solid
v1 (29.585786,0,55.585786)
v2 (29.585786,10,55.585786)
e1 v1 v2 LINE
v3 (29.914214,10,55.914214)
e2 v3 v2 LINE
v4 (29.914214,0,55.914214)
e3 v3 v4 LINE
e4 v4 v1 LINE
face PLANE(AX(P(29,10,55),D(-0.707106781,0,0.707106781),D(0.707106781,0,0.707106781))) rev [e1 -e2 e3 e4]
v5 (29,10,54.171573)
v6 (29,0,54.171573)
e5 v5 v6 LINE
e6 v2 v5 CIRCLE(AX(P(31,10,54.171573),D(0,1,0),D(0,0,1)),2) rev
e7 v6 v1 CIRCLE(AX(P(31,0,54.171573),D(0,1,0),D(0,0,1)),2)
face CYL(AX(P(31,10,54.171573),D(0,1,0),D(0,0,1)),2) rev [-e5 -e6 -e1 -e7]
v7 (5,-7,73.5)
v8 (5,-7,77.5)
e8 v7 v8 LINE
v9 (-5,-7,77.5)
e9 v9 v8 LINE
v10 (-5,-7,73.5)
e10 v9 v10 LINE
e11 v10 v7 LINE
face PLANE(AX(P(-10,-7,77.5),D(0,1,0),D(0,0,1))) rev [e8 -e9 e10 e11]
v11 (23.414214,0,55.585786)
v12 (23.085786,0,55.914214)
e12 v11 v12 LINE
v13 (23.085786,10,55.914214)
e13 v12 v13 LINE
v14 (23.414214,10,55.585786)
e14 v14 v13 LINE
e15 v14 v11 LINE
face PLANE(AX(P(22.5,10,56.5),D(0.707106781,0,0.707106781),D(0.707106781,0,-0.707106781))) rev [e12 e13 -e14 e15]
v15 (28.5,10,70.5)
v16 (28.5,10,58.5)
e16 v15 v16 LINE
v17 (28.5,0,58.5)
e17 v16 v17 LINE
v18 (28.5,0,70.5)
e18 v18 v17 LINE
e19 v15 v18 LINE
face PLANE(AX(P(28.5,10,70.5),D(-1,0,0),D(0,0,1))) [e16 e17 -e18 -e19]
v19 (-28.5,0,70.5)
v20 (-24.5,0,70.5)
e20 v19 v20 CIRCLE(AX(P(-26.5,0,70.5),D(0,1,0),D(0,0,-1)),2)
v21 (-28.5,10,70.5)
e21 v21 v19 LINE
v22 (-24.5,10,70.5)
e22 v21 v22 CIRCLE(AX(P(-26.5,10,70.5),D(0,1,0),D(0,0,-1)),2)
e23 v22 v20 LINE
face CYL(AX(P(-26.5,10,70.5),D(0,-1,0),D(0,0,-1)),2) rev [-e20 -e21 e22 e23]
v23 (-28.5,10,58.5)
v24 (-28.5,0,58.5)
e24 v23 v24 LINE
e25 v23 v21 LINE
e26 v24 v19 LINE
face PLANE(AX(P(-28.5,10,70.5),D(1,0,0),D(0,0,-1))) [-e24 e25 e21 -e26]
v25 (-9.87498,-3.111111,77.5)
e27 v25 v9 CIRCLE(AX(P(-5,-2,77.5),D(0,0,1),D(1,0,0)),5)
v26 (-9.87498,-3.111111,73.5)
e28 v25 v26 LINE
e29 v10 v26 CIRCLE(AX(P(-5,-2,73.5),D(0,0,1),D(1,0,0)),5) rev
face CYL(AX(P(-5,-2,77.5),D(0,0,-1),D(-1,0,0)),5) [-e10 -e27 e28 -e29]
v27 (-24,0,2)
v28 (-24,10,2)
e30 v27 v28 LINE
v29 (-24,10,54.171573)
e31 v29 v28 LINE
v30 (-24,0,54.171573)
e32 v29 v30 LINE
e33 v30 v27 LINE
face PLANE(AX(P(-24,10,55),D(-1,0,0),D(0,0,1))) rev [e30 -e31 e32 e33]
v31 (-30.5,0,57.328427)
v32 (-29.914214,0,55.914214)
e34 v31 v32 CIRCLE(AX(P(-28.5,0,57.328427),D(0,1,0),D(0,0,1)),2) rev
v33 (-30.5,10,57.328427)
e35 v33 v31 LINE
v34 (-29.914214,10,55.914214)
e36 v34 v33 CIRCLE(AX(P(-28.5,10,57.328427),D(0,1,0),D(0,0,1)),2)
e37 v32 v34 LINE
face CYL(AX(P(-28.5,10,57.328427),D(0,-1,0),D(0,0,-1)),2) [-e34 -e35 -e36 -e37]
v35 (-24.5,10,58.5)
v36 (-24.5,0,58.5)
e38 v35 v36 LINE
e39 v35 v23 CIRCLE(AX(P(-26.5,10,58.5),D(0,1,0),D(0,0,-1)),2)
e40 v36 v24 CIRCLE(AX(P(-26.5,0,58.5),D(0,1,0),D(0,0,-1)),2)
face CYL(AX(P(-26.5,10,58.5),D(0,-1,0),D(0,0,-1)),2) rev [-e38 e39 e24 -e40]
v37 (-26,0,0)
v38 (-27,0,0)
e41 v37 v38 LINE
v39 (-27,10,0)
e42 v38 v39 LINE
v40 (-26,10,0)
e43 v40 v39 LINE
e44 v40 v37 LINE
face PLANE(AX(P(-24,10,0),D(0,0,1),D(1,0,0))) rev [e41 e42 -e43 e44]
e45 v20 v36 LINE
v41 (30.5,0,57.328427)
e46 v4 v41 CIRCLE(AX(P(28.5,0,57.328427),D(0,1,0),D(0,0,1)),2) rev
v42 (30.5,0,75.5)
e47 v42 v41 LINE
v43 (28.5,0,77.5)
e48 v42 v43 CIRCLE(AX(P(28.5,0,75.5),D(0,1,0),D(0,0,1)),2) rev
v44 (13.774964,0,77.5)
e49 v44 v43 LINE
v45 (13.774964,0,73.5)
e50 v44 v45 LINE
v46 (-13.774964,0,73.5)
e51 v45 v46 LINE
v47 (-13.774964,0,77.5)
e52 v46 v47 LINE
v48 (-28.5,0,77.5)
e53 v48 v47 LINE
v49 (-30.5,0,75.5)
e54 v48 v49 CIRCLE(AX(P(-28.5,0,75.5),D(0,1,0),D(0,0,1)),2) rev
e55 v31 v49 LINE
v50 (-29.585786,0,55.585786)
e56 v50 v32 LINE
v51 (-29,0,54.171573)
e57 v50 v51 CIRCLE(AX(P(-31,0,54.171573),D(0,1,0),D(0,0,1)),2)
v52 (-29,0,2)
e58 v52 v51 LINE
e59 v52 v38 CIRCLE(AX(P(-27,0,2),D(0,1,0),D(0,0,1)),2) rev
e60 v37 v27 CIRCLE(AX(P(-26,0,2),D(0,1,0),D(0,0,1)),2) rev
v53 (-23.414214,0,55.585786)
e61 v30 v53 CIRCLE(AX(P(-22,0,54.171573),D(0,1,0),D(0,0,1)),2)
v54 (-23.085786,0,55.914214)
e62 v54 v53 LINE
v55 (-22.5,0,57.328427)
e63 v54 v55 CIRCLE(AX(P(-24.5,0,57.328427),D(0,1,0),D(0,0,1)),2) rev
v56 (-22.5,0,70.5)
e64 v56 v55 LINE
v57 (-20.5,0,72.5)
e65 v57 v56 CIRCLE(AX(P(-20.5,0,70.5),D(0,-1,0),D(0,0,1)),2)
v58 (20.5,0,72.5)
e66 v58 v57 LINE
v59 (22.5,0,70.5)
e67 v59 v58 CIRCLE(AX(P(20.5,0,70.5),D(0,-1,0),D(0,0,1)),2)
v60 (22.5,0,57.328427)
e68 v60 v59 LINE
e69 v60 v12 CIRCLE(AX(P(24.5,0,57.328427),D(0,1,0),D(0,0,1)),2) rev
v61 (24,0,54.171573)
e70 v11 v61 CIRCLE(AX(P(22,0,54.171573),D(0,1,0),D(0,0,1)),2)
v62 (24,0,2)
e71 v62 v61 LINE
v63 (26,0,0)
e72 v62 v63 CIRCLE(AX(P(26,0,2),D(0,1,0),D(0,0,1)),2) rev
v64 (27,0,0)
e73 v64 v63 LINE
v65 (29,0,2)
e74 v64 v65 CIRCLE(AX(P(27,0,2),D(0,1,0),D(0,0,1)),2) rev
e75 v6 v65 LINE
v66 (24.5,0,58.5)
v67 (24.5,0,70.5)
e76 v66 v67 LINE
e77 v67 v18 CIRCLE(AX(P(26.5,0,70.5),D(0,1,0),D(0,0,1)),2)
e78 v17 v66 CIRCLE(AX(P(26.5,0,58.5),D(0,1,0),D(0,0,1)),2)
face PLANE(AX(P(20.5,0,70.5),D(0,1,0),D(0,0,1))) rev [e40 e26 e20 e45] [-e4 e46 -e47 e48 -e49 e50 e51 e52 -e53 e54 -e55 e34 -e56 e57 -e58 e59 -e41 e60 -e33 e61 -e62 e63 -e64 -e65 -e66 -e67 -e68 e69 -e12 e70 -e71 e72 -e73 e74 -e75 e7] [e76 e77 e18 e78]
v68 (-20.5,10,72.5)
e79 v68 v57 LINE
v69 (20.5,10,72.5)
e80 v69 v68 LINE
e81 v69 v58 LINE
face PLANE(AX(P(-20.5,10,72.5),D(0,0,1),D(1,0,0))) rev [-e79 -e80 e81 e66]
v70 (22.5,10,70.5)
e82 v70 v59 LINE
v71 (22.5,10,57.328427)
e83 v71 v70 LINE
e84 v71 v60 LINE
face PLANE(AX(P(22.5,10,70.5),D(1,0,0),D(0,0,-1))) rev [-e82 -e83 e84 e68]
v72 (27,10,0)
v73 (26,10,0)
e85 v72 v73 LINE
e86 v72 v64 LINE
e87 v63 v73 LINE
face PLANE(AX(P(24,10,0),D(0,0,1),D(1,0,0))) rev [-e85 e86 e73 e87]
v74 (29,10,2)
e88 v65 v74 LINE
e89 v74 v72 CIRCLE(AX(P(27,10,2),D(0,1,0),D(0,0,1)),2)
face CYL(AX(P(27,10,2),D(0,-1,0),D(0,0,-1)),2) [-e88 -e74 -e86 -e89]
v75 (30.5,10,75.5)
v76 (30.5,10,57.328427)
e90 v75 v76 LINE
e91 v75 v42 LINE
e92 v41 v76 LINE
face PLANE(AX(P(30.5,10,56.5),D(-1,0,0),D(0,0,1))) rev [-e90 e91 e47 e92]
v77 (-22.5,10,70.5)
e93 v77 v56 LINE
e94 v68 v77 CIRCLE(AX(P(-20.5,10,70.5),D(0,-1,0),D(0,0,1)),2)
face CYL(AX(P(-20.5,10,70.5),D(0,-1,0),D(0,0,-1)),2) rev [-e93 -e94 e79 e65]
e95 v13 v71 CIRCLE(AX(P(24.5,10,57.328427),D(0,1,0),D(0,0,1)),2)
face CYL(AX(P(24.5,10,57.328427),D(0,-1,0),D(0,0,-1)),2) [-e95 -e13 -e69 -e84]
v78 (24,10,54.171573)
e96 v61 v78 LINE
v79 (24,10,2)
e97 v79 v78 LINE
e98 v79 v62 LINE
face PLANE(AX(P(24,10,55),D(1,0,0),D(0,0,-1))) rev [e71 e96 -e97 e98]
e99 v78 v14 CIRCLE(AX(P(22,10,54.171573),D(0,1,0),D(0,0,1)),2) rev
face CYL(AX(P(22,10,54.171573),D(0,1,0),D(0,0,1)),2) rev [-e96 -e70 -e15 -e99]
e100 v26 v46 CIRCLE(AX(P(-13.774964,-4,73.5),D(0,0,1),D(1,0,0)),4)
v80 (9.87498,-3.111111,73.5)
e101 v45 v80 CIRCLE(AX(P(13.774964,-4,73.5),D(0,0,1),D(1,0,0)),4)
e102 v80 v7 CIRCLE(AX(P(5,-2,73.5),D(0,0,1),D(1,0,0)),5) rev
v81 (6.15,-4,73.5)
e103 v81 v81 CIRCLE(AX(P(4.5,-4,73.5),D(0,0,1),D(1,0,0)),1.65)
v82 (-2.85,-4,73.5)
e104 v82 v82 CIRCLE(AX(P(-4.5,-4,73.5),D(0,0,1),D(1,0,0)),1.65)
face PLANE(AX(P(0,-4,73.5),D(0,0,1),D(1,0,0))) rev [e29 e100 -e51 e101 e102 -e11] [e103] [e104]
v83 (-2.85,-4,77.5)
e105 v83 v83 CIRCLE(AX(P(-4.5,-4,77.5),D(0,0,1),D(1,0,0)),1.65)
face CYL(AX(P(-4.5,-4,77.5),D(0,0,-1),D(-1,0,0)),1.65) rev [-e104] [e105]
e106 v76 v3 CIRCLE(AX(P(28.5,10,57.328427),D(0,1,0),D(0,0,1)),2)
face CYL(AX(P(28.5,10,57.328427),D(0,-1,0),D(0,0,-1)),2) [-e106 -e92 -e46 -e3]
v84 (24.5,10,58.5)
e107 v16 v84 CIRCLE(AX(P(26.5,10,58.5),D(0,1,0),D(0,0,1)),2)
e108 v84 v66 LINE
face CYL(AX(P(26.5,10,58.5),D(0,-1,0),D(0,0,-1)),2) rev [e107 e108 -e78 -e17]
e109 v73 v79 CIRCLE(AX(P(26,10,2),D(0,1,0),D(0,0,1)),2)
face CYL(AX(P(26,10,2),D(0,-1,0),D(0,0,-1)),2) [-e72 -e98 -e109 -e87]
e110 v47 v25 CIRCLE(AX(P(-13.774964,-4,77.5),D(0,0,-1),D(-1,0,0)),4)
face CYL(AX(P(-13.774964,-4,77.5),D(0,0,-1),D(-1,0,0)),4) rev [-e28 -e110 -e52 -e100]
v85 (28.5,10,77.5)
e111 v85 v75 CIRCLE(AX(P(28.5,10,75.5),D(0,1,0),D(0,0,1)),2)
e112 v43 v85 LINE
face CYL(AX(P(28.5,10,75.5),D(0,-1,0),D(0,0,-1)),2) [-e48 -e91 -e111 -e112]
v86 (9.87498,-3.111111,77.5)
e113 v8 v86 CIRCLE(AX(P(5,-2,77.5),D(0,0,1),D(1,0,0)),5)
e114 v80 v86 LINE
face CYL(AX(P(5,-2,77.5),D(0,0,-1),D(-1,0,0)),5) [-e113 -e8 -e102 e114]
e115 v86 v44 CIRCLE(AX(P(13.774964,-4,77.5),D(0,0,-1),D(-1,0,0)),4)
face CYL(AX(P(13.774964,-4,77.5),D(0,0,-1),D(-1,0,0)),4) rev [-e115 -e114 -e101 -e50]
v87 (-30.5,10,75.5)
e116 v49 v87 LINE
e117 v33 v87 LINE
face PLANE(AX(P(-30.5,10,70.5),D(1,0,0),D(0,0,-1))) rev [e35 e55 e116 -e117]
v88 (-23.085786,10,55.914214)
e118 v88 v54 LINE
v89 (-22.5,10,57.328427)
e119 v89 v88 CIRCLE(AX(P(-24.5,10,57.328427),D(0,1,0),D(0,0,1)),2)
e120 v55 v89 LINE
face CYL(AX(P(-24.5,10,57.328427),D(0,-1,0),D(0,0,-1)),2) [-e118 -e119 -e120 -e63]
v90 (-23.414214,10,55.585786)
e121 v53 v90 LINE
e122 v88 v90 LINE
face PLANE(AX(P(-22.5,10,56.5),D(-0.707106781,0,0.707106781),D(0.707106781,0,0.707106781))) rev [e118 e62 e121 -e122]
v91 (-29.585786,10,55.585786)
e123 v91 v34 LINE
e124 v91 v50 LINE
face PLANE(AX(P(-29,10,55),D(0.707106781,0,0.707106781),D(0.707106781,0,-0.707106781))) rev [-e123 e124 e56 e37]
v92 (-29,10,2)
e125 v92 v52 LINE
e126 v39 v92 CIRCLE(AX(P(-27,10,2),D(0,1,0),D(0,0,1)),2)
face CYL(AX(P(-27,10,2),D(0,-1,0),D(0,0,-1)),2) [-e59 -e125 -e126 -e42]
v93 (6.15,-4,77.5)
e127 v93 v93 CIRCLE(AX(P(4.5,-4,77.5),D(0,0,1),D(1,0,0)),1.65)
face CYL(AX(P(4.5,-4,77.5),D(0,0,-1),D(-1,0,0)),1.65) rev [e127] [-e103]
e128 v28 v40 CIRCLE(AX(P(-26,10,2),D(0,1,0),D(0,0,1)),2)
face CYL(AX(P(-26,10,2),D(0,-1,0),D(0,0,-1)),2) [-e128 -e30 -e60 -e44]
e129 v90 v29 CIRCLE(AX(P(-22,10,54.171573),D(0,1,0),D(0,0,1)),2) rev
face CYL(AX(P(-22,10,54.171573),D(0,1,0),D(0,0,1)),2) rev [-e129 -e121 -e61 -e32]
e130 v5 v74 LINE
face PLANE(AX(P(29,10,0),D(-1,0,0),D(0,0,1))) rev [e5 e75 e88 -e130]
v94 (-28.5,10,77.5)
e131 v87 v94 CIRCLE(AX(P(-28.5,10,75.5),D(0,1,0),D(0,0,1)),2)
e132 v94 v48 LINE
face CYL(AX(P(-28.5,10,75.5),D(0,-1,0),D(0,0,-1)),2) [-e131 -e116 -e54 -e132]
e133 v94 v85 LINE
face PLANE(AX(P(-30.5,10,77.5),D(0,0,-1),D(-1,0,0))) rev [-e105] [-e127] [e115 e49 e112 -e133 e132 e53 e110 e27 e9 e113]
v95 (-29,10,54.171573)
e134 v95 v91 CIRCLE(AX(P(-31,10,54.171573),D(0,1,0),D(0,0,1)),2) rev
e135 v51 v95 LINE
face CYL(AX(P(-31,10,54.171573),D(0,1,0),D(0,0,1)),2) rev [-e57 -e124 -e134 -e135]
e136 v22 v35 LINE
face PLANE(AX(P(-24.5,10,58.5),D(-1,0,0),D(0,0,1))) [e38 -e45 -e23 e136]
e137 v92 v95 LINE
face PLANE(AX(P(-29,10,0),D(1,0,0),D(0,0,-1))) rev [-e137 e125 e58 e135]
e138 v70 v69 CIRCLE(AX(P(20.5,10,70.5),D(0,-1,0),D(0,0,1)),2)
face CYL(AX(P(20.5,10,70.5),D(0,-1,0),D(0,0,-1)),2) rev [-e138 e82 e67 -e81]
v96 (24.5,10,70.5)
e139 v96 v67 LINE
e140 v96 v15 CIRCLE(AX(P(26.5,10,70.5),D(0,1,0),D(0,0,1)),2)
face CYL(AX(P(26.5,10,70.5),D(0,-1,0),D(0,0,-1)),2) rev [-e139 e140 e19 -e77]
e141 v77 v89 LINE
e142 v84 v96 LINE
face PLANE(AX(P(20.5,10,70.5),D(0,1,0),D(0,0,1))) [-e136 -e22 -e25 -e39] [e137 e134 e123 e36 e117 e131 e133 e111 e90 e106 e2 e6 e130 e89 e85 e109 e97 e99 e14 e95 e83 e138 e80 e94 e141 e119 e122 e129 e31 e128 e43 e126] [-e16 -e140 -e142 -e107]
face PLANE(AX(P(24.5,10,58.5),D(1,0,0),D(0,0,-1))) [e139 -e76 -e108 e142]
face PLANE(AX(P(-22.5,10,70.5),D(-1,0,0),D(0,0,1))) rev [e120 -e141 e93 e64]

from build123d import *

# Parameters (mm, degrees)
BOSS_EXTRUDE1_DEPTH = 10
FILLET1_R           = 2
FILLET2_R           = 2
BLOCK_START         = 73.5
BLOCK_OUTLINE_R     = 1.65
BLOCK_DEPTH         = 4
BLOCK_START_2       = 77.5
BLOCK_2_DEPTH       = 0.2
CUT_EXTRUDE1_START  = -0.2
CUT_EXTRUDE1_DEPTH  = 0.2
FILLET4_R           = 4


# Read off the part's stored shape, not the designer's step: block
with BuildPart() as part:
    # Sketch1 → Boss-Extrude1 (new body)
    with BuildSketch(Plane(origin=(0, 0, 0), x_dir=(1, 0, 0), z_dir=(0, 1, 0))):
        with BuildLine():
            Line((24, -55), (24, 0))
            Line((24, 0), (29, 0))
            Line((29, 0), (29, -55))
            Line((29, -55), (30.5, -56.5))
            Line((30.5, -56.5), (30.5, -70.5))
            Line((30.5, -70.5), (30.5, -77.5))
            Line((30.5, -77.5), (-30.5, -77.5))
            Line((-30.5, -77.5), (-30.5, -70.5))
            Line((-30.5, -70.5), (-30.5, -56.5))
            Line((-30.5, -56.5), (-29, -55))
            Line((-29, -55), (-29, 0))
            Line((-29, 0), (-24, 0))
            Line((-24, 0), (-24, -55))
            Line((-24, -55), (-22.5, -56.5))
            Line((-22.5, -56.5), (-22.5, -70.5))
            ThreePointArc((-22.5, -70.5), (-21.914213562, -71.914213562), (-20.5, -72.5))
            Line((-20.5, -72.5), (20.5, -72.5))
            ThreePointArc((20.5, -72.5), (21.914213562, -71.914213562), (22.5, -70.5))
            Line((22.5, -70.5), (22.5, -56.5))
            Line((22.5, -56.5), (24, -55))
        make_face()
        with BuildLine():
            Line((24.5, -58.5), (24.5, -70.5))
            ThreePointArc((24.5, -70.5), (26.5, -72.5), (28.5, -70.5))
            Line((28.5, -70.5), (28.5, -58.5))
            ThreePointArc((28.5, -58.5), (26.5, -56.5), (24.5, -58.5))
        make_face(mode=Mode.SUBTRACT)
        with BuildLine():
            Line((-28.5, -70.5), (-28.5, -58.5))
            ThreePointArc((-28.5, -58.5), (-26.5, -56.5), (-24.5, -58.5))
            Line((-24.5, -58.5), (-24.5, -70.5))
            ThreePointArc((-24.5, -70.5), (-26.5, -72.5), (-28.5, -70.5))
        make_face(mode=Mode.SUBTRACT)
    extrude(amount=BOSS_EXTRUDE1_DEPTH)

    # Fillet1
    fillet1_edges = [part.edges().sort_by_distance(p)[0] for p in [
        (30.5, 5, 77.5),
        (-30.5, 5, 77.5),
        (-30.5, 5, 56.5),
        (-29, 5, 55),
        (-24, 5, 55),
        (-22.5, 5, 56.5),
        (22.5, 5, 56.5),
        (24, 5, 55),
        (29, 5, 55),
        (30.5, 5, 56.5),
    ]]
    fillet(fillet1_edges, radius=FILLET1_R)

    # Fillet2
    fillet2_edges = [part.edges().sort_by_distance(p)[0] for p in [
        (-29, 5, 0),
        (-24, 5, 0),
        (24, 5, 0),
        (29, 5, 0),
    ]]
    fillet(fillet2_edges, radius=FILLET2_R)


with BuildPart() as body_2:
    # block outline → block (new body)
    with BuildSketch(Plane.XY.offset(BLOCK_START)):
        with BuildLine():
            Line((-10, 0), (-10, -2))
            ThreePointArc((-10, -2), (-8.535533906, -5.535533906), (-5, -7))
            Line((-5, -7), (5, -7))
            ThreePointArc((5, -7), (8.535533906, -5.535533906), (10, -2))
            Line((10, -2), (10, 0))
            Line((10, 0), (-10, 0))
        make_face()
        with Locations((-4.5, -4)):
            Circle(BLOCK_OUTLINE_R, mode=Mode.SUBTRACT)
        with Locations((4.5, -4)):
            Circle(BLOCK_OUTLINE_R, mode=Mode.SUBTRACT)
    extrude(amount=BLOCK_DEPTH)

    # block 2 outline → block 2 (add)
    with BuildSketch(Plane.XY.offset(BLOCK_START_2)):
        with BuildLine():
            ThreePointArc((-3, -0.5), (-3.2, -0.7), (-3, -0.9))
            Line((-3, -0.9), (3, -0.9))
            ThreePointArc((3, -0.9), (3.2, -0.7), (3, -0.5))
            Line((3, -0.5), (-3, -0.5))
        make_face()
    extrude(amount=BLOCK_2_DEPTH)


with BuildPart() as part_1:
    add(part.part)

    # Combine1: union body 2
    add(body_2.part)

    # Sketch3 → Cut-Extrude1 (cut)
    with BuildSketch(Plane.XY.offset(77.7).offset(CUT_EXTRUDE1_START)):
        with BuildLine():
            Line((-3, -0.9), (3, -0.9))
            ThreePointArc((3, -0.9), (3.2, -0.7), (3, -0.5))
            Line((3, -0.5), (-3, -0.5))
            ThreePointArc((-3, -0.5), (-3.2, -0.7), (-3, -0.9))
        make_face()
    extrude(amount=CUT_EXTRUDE1_DEPTH, mode=Mode.SUBTRACT)

    # Fillet4
    # the kernel refuses this fillet: 4 mm, written as the material it adds along each edge
    with BuildSketch(Plane(origin=(10, 0, 73.5), x_dir=(1, 0, 0), z_dir=(0, 0, 1))) as fillet4_piece_1:
        with BuildLine():
            CenterArc((3.774964387, -4), FILLET4_R, 90, 77.160411594)
            Line((-0.125019785, -3.111111111), (-0.515018202, -3.022222222))
            ThreePointArc((-0.515018202, -3.022222222), (-0.4, -2), (-0.4, 0))
            Line((-0.4, 0), (0, 0.4))
            Line((0, 0.4), (3.774964387, 0.4))
            Line((3.774964387, 0.4), (3.774964387, 0))
        make_face()
    extrude(amount=4)
    with BuildSketch(Plane(origin=(-10, 0, 73.5), x_dir=(-1, 0, 0), z_dir=(0, 0, 1))) as fillet4_piece_2:
        with BuildLine():
            CenterArc((3.774964387, 4), FILLET4_R, 192.839588406, 77.160411594)
            Line((-0.125019785, 3.111111111), (-0.515018202, 3.022222222))
            ThreePointArc((-0.515018202, 3.022222222), (-0.4, 2), (-0.4, 0))
            Line((-0.4, 0), (0, -0.4))
            Line((0, -0.4), (3.774964387, -0.4))
            Line((3.774964387, -0.4), (3.774964387, 0))
        make_face()
    extrude(amount=4)


solid = part_1.part
